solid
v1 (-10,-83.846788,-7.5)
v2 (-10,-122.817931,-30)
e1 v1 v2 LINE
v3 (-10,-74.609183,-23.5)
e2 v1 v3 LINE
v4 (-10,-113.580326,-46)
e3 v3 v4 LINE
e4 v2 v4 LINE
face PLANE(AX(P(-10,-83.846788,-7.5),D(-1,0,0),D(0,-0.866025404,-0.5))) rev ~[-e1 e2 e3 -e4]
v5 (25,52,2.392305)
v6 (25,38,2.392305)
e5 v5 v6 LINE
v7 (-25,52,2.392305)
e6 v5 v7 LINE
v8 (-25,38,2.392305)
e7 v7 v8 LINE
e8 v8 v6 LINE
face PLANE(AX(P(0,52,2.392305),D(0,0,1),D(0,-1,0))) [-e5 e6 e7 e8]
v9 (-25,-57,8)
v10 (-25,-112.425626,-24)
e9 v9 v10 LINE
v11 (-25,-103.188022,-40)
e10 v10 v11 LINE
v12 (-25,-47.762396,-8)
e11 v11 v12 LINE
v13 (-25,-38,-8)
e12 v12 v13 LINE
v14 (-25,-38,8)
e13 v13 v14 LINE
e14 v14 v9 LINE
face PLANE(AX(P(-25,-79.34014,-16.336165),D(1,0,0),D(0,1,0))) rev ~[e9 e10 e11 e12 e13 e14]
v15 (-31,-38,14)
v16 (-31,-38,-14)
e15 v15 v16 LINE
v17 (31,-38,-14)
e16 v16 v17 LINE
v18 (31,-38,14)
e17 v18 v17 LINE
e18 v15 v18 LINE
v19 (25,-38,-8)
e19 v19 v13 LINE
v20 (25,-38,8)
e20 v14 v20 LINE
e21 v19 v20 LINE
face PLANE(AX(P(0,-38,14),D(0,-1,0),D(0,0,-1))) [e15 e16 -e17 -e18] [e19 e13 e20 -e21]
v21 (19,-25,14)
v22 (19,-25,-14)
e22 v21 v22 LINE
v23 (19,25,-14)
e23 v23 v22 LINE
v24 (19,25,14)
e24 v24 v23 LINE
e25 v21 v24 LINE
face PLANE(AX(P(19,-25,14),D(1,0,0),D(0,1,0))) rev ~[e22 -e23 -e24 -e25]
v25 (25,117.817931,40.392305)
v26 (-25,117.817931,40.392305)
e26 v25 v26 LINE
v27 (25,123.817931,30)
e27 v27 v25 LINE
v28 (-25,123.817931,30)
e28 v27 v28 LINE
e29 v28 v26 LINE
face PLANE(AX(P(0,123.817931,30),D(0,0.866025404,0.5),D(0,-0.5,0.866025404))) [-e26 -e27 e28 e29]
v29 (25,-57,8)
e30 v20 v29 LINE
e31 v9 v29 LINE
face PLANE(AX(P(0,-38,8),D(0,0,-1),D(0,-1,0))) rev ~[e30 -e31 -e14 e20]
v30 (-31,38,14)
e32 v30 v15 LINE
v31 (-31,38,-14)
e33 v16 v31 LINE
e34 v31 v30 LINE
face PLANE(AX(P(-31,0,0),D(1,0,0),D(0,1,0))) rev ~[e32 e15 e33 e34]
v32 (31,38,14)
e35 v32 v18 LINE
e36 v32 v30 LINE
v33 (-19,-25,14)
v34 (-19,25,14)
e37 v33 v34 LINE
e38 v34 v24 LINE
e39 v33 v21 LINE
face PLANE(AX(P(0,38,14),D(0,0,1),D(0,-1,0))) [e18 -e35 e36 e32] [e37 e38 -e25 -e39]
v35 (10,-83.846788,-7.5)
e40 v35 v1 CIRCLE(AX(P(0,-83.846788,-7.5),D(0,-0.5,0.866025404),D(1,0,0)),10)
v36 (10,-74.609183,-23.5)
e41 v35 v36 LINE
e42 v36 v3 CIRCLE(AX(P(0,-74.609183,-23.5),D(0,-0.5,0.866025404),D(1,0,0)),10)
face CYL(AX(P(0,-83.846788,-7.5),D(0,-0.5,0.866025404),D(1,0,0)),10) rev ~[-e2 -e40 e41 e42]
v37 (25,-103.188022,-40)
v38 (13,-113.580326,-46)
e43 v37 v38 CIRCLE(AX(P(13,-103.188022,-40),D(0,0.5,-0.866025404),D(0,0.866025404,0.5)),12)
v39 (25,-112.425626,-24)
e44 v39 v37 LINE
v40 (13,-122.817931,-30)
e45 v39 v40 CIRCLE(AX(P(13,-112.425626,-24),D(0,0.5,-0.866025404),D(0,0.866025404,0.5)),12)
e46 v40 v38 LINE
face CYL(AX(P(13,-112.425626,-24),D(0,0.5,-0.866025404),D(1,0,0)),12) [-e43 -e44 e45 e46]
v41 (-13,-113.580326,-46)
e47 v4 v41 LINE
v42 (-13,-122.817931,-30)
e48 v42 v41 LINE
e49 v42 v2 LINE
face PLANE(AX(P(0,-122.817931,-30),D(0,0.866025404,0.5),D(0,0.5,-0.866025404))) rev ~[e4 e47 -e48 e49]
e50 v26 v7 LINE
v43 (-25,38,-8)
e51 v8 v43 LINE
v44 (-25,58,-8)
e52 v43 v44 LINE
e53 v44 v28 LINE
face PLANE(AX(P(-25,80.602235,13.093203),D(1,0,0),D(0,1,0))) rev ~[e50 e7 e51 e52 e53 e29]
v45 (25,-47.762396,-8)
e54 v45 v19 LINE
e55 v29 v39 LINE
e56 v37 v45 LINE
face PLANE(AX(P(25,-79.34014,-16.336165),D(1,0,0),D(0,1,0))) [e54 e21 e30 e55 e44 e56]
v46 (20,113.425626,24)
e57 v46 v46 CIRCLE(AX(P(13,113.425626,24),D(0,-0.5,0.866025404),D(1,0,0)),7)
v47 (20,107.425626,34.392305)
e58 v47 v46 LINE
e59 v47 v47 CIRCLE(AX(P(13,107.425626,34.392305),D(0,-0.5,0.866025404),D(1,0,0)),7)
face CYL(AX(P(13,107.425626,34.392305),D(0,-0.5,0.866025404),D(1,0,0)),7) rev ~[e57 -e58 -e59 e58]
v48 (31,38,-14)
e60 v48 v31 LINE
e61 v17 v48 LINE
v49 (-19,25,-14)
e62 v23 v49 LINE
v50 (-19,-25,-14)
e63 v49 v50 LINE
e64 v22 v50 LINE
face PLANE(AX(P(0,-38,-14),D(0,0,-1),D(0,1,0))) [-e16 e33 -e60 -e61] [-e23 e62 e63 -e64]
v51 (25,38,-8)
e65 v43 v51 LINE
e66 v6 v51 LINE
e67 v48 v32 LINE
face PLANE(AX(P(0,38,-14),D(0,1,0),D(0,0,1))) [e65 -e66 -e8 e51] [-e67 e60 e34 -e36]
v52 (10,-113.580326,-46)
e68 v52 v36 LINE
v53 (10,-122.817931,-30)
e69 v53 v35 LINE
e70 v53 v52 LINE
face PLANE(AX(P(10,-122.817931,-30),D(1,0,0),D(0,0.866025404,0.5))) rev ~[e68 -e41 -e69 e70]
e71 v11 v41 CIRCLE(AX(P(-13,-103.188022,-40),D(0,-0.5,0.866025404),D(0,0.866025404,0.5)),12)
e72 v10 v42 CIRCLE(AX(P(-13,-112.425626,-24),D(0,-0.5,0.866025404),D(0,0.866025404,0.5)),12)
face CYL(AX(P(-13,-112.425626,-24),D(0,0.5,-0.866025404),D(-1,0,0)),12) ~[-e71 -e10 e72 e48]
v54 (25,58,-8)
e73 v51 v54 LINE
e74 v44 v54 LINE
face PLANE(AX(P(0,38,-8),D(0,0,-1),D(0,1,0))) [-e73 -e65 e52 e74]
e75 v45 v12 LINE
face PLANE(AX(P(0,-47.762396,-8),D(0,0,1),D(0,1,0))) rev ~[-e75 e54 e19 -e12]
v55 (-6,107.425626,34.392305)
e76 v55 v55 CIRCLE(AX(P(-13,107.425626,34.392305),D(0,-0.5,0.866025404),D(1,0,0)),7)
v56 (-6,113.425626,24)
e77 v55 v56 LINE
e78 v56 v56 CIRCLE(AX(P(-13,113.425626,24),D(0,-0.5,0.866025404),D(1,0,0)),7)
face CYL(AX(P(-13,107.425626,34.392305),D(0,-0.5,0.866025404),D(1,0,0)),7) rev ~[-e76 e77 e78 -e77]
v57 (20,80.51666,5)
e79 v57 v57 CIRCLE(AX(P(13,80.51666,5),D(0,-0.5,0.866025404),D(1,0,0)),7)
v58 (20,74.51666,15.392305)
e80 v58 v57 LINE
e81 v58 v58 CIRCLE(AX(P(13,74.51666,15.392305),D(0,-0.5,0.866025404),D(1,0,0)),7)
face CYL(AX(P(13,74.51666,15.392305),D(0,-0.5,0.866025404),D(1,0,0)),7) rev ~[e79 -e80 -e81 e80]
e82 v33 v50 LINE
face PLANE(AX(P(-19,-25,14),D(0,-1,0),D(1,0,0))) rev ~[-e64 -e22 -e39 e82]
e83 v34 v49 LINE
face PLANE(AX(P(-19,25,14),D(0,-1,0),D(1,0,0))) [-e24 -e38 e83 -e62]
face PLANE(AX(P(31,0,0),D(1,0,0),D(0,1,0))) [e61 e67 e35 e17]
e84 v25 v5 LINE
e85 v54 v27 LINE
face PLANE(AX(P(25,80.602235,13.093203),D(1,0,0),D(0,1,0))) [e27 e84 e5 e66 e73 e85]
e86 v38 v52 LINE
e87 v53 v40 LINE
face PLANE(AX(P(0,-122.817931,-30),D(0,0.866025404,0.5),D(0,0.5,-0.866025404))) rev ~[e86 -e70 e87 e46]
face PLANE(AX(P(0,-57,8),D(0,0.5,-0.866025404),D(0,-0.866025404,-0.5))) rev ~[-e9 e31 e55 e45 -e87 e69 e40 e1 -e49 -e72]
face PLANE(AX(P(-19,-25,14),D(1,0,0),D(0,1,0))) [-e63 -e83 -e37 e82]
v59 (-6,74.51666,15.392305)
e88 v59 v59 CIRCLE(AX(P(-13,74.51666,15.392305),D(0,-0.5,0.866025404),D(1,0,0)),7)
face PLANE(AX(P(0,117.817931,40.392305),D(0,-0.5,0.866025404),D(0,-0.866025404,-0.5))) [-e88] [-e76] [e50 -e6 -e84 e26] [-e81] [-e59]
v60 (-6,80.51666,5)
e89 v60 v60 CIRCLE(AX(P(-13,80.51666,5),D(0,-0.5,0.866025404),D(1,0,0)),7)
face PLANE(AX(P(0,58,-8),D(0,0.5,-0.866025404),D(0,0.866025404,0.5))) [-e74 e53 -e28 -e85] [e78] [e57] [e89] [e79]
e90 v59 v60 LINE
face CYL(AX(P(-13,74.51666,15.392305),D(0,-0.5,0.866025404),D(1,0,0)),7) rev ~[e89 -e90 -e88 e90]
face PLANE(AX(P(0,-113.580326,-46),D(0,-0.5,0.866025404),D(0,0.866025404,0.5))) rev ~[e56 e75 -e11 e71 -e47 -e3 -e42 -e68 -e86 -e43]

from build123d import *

# Parameters (mm, degrees)
F1_DEPTH = 31
F2_DEPTH = 25
F4_DEPTH = 137.1753371482
F5_R     = 12
F6_R     = 7
F7_DEPTH = 77.8189306876
F8_W     = 38
F8_H     = 50
F9_DEPTH = 60.001


# Not quite as in the source:
# - a feature of the source that left no trace in its solid (it failed there, or was rolled back) is left out


with BuildPart() as f1:
    # F0 (on Right) → F1 (new body, symmetric)
    with BuildSketch(Plane.YZ):
        Polygon((38, 2.3923048454), (38, 14), (-38, 14), (-38, 8), (-38, -8), (-38, -14), (38, -14), (38, -8), align=None)
    extrude(amount=F1_DEPTH, both=True)

    # F0 (on Right) → F2 (join, symmetric)
    with BuildSketch(Plane.YZ):
        Polygon((-38, -8), (-38, 8), (-57, 8), (-122.8179306876, -30), (-113.5803263806, -46), (-47.762395693, -8), align=None)
        Polygon((52, 2.3923048454), (38, 2.3923048454), (38, -8), (58, -8), (123.8179306876, 30), (117.8179306876, 40.3923048454), align=None)
    extrude(amount=F2_DEPTH, both=True)

    # F3 (on face) → F4 (cut, through all)
    with BuildSketch(Plane(origin=(0, -17.7141016151, 30.6817240079), x_dir=(1, 0, 0), z_dir=(0, -0.5, 0.8660254038))):
        with BuildLine():
            Line((10, -121.3634480157), (10, -76.3634480157))
            ThreePointArc((10, -76.3634480157), (0, -86.3634480157), (-10, -76.3634480157))
            Line((-10, -76.3634480157), (-10, -121.3634480157))
            Line((-10, -121.3634480157), (10, -121.3634480157))
        make_face()
        with BuildLine():
            ThreePointArc((-10, -76.3634480157), (0, -86.3634480157), (10, -76.3634480157))
            ThreePointArc((10, -76.3634480157), (0, -66.3634480157), (-10, -76.3634480157))
        make_face()
    extrude(amount=-F4_DEPTH, mode=Mode.SUBTRACT)

    # F5
    f5_edges = [f1.edges().sort_by_distance(p)[0] for p in [
        (25, -118.199129, -38),
        (-25, -118.199129, -38),
    ]]
    fillet(f5_edges, radius=F5_R)

    # F6 (on face) → F7 (cut, through all)
    with BuildSketch(Plane(origin=(0, 11.9641016151, -20.7224318643), x_dir=(1, 0, 0), z_dir=(0, -0.5, 0.8660254038))):
        with Locations((-13, 110.2294734195)):
            Circle(F6_R)
        with Locations((13, 110.2294734195)):
            Circle(F6_R)
        with Locations((13, 72.2294734195)):
            Circle(F6_R)
        with Locations((-13, 72.2294734195)):
            Circle(F6_R)
    extrude(amount=-F7_DEPTH, mode=Mode.SUBTRACT)

    # F8 (on face) → F9 (cut, through all)
    with BuildSketch(Plane.XY.offset(14)):
        Rectangle(F8_W, F8_H)
    extrude(amount=-F9_DEPTH, mode=Mode.SUBTRACT)


solid = f1.part
